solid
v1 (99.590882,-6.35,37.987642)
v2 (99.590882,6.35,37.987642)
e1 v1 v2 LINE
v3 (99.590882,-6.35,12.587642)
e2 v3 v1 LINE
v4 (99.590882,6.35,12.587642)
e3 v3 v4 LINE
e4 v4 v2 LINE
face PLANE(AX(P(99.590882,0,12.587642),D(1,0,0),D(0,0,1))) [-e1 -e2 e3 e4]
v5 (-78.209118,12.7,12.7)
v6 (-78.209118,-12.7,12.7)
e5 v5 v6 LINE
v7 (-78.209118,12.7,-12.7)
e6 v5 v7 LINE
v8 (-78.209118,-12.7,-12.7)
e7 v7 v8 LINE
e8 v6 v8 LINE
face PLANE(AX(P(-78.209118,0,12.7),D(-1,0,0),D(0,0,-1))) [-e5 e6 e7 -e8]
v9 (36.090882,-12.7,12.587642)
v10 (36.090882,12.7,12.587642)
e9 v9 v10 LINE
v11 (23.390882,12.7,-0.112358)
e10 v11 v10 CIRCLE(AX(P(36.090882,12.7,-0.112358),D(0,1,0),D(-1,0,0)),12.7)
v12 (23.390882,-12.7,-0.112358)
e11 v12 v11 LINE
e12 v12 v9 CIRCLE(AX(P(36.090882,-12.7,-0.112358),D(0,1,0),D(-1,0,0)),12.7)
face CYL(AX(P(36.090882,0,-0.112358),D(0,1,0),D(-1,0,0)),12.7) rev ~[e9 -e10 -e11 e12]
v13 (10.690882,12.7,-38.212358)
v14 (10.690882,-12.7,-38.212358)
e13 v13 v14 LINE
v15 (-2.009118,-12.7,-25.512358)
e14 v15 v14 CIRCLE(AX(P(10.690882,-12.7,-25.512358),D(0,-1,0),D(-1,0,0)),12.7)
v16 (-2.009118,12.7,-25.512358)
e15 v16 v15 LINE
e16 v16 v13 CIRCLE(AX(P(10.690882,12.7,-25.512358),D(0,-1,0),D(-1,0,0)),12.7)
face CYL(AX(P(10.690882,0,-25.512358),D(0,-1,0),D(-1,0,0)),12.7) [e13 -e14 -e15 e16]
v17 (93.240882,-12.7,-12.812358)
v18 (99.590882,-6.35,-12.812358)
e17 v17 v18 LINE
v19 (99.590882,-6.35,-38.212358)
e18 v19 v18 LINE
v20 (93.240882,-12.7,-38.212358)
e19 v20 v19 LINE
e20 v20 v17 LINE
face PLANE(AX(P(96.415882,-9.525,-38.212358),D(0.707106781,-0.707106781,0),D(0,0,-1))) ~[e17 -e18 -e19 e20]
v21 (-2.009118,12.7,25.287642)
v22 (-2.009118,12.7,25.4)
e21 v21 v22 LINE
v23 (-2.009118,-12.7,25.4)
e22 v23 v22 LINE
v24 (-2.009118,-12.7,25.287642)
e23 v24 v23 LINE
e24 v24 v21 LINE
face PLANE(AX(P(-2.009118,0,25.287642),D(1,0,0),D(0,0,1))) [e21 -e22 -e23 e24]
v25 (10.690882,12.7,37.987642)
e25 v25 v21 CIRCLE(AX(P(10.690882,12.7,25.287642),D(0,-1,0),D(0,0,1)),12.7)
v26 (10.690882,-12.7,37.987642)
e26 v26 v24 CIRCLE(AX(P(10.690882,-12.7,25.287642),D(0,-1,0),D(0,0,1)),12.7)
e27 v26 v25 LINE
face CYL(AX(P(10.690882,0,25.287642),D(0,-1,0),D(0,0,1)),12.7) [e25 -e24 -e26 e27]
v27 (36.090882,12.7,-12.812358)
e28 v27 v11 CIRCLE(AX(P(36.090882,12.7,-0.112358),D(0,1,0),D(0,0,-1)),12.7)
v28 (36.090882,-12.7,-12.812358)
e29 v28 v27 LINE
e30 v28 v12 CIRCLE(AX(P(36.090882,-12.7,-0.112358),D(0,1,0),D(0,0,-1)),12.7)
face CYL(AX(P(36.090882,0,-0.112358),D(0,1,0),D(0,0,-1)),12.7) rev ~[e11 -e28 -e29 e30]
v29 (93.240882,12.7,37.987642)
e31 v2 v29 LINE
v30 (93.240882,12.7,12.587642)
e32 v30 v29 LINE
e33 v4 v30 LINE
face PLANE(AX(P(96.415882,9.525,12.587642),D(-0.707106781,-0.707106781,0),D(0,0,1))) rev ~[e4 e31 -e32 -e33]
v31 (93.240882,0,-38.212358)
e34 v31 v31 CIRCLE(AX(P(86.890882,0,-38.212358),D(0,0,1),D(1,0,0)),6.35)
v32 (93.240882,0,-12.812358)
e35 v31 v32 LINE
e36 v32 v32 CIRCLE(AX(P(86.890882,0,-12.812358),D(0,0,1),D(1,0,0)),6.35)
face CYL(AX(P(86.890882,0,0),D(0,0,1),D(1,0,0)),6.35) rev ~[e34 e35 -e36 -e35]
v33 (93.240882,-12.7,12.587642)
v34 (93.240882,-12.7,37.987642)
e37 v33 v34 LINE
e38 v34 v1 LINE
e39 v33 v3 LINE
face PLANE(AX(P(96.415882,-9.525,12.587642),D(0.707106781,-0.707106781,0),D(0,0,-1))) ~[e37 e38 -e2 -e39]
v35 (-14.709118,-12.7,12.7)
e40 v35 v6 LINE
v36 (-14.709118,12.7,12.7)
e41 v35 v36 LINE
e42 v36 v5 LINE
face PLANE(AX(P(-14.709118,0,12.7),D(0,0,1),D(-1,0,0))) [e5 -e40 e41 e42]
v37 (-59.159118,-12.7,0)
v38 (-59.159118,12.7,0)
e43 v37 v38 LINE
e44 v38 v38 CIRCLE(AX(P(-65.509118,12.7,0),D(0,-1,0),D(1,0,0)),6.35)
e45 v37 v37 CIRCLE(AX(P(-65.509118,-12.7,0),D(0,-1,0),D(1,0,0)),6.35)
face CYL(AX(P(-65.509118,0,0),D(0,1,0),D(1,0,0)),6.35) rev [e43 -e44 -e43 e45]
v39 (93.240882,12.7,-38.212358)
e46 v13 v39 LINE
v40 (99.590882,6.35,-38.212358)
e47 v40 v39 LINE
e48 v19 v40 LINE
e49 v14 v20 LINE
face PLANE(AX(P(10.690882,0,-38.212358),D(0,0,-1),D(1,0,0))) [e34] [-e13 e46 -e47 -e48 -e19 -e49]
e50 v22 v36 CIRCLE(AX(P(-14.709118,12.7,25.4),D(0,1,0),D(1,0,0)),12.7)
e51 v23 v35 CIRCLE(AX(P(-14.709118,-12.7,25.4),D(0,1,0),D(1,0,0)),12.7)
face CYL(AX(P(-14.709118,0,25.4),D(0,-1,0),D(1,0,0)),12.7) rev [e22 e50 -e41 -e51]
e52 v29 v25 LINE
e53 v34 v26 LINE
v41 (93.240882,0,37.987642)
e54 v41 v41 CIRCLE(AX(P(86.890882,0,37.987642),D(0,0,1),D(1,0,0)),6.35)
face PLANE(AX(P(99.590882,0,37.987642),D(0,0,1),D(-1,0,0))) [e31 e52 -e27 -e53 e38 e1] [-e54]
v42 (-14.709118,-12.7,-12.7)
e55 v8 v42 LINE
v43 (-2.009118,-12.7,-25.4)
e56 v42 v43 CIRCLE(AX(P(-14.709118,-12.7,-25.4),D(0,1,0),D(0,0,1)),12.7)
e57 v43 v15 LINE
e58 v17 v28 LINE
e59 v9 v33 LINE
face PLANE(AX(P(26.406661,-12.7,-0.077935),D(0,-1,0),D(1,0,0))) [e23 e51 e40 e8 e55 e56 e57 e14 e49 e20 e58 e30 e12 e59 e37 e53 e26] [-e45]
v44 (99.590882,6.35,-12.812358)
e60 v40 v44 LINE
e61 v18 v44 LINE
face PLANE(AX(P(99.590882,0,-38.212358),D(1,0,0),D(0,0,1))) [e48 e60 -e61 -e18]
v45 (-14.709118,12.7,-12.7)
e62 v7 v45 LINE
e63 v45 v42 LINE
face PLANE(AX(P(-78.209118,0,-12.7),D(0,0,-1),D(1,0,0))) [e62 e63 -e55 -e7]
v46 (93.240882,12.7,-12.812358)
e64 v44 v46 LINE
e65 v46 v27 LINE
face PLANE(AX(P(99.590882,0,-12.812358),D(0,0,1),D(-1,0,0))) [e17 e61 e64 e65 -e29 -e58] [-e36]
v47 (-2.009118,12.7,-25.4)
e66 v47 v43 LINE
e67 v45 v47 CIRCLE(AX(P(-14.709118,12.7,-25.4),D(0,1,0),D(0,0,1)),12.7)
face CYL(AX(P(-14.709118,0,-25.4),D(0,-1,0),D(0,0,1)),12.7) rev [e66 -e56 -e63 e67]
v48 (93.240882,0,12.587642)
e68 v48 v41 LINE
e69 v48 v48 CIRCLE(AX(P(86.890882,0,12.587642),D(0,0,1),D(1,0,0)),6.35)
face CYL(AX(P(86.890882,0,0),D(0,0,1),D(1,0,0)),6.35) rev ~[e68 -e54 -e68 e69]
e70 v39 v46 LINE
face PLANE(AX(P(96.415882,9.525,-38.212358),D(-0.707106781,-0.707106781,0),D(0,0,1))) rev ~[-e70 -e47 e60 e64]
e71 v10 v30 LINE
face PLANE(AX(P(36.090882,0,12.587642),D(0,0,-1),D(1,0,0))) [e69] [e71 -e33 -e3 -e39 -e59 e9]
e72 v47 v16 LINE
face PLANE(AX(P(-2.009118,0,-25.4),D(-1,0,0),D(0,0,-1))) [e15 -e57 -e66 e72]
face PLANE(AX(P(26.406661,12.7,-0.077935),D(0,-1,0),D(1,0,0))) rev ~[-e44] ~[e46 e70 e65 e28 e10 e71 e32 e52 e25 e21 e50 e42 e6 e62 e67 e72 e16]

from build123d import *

# Parameters (mm, degrees)
F0_R     = 6.35
F1_DEPTH = 12.7
F2_R     = 6.35
F3_DEPTH = 44.45
F4_SIZE  = 6.35
F5_SIZE  = 6.35
F6_SIZE  = 6.35
F7_SIZE  = 6.35


# Not quite as in the source:
# - a feature names something its author has since deleted; it is built from what else it names


with BuildPart() as f1:
    # F0 (on Front) → F1 (new body, symmetric)
    with BuildSketch(Plane.XZ):
        with BuildLine():
            Line((-14.7091181397, 12.7), (-78.2091181397, 12.7))
            Line((-78.2091181397, 12.7), (-78.2091181397, -12.7))
            Line((-78.2091181397, -12.7), (-14.7091181397, -12.7))
            ThreePointArc((-14.7091181397, -12.7), (-5.7288620187, -16.4197438789), (-2.0091181397, -25.4))
            Line((-2.0091181397, -25.4), (-2.0091181397, -25.5123577416))
            ThreePointArc((-2.0091181397, -25.5123577416), (1.7106257392, -34.4926138626), (10.6908818603, -38.2123577416))
            Line((10.6908818603, -38.2123577416), (99.5908818603, -38.2123577416))
            Line((99.5908818603, -38.2123577416), (99.5908818603, -12.8123577416))
            Line((99.5908818603, -12.8123577416), (36.0908818603, -12.8123577416))
            ThreePointArc((36.0908818603, -12.8123577416), (27.1106257392, -9.0926138626), (23.3908818603, -0.1123577416))
            ThreePointArc((23.3908818603, -0.1123577416), (27.1106257392, 8.8678983795), (36.0908818603, 12.5876422584))
            Line((36.0908818603, 12.5876422584), (99.5908818603, 12.5876422584))
            Line((99.5908818603, 12.5876422584), (99.5908818603, 37.9876422584))
            Line((99.5908818603, 37.9876422584), (10.6908818603, 37.9876422584))
            ThreePointArc((10.6908818603, 37.9876422584), (1.7106257392, 34.2678983795), (-2.0091181397, 25.2876422584))
            Line((-2.0091181397, 25.2876422584), (-2.0091181397, 25.4))
            ThreePointArc((-2.0091181397, 25.4), (-5.7288620187, 16.4197438789), (-14.7091181397, 12.7))
        make_face()
        with Locations((-65.5091181397, 0)):
            Circle(F0_R, mode=Mode.SUBTRACT)
    extrude(amount=F1_DEPTH, both=True)

    # F2 (on Top) → F3 (cut, symmetric)
    with BuildSketch(Plane.XY):
        with Locations((86.8908818603, 0)):
            Circle(F2_R)
    extrude(amount=F3_DEPTH, both=True, mode=Mode.SUBTRACT)

    # F4
    f4_edges = [f1.edges().sort_by_distance(p)[0] for p in [
        (99.590882, -12.7, 25.287642),
    ]]
    chamfer(f4_edges, length=F4_SIZE)

    # F5
    f5_edges = [f1.edges().sort_by_distance(p)[0] for p in [
        (99.590882, 12.7, 25.287642),
    ]]
    chamfer(f5_edges, length=F5_SIZE)

    # F6
    f6_edges = [f1.edges().sort_by_distance(p)[0] for p in [
        (99.590882, -12.7, -25.512358),
    ]]
    chamfer(f6_edges, length=F6_SIZE)

    # F7
    f7_edges = [f1.edges().sort_by_distance(p)[0] for p in [
        (99.590882, 12.7, -25.512358),
    ]]
    chamfer(f7_edges, length=F7_SIZE)


solid = f1.part
